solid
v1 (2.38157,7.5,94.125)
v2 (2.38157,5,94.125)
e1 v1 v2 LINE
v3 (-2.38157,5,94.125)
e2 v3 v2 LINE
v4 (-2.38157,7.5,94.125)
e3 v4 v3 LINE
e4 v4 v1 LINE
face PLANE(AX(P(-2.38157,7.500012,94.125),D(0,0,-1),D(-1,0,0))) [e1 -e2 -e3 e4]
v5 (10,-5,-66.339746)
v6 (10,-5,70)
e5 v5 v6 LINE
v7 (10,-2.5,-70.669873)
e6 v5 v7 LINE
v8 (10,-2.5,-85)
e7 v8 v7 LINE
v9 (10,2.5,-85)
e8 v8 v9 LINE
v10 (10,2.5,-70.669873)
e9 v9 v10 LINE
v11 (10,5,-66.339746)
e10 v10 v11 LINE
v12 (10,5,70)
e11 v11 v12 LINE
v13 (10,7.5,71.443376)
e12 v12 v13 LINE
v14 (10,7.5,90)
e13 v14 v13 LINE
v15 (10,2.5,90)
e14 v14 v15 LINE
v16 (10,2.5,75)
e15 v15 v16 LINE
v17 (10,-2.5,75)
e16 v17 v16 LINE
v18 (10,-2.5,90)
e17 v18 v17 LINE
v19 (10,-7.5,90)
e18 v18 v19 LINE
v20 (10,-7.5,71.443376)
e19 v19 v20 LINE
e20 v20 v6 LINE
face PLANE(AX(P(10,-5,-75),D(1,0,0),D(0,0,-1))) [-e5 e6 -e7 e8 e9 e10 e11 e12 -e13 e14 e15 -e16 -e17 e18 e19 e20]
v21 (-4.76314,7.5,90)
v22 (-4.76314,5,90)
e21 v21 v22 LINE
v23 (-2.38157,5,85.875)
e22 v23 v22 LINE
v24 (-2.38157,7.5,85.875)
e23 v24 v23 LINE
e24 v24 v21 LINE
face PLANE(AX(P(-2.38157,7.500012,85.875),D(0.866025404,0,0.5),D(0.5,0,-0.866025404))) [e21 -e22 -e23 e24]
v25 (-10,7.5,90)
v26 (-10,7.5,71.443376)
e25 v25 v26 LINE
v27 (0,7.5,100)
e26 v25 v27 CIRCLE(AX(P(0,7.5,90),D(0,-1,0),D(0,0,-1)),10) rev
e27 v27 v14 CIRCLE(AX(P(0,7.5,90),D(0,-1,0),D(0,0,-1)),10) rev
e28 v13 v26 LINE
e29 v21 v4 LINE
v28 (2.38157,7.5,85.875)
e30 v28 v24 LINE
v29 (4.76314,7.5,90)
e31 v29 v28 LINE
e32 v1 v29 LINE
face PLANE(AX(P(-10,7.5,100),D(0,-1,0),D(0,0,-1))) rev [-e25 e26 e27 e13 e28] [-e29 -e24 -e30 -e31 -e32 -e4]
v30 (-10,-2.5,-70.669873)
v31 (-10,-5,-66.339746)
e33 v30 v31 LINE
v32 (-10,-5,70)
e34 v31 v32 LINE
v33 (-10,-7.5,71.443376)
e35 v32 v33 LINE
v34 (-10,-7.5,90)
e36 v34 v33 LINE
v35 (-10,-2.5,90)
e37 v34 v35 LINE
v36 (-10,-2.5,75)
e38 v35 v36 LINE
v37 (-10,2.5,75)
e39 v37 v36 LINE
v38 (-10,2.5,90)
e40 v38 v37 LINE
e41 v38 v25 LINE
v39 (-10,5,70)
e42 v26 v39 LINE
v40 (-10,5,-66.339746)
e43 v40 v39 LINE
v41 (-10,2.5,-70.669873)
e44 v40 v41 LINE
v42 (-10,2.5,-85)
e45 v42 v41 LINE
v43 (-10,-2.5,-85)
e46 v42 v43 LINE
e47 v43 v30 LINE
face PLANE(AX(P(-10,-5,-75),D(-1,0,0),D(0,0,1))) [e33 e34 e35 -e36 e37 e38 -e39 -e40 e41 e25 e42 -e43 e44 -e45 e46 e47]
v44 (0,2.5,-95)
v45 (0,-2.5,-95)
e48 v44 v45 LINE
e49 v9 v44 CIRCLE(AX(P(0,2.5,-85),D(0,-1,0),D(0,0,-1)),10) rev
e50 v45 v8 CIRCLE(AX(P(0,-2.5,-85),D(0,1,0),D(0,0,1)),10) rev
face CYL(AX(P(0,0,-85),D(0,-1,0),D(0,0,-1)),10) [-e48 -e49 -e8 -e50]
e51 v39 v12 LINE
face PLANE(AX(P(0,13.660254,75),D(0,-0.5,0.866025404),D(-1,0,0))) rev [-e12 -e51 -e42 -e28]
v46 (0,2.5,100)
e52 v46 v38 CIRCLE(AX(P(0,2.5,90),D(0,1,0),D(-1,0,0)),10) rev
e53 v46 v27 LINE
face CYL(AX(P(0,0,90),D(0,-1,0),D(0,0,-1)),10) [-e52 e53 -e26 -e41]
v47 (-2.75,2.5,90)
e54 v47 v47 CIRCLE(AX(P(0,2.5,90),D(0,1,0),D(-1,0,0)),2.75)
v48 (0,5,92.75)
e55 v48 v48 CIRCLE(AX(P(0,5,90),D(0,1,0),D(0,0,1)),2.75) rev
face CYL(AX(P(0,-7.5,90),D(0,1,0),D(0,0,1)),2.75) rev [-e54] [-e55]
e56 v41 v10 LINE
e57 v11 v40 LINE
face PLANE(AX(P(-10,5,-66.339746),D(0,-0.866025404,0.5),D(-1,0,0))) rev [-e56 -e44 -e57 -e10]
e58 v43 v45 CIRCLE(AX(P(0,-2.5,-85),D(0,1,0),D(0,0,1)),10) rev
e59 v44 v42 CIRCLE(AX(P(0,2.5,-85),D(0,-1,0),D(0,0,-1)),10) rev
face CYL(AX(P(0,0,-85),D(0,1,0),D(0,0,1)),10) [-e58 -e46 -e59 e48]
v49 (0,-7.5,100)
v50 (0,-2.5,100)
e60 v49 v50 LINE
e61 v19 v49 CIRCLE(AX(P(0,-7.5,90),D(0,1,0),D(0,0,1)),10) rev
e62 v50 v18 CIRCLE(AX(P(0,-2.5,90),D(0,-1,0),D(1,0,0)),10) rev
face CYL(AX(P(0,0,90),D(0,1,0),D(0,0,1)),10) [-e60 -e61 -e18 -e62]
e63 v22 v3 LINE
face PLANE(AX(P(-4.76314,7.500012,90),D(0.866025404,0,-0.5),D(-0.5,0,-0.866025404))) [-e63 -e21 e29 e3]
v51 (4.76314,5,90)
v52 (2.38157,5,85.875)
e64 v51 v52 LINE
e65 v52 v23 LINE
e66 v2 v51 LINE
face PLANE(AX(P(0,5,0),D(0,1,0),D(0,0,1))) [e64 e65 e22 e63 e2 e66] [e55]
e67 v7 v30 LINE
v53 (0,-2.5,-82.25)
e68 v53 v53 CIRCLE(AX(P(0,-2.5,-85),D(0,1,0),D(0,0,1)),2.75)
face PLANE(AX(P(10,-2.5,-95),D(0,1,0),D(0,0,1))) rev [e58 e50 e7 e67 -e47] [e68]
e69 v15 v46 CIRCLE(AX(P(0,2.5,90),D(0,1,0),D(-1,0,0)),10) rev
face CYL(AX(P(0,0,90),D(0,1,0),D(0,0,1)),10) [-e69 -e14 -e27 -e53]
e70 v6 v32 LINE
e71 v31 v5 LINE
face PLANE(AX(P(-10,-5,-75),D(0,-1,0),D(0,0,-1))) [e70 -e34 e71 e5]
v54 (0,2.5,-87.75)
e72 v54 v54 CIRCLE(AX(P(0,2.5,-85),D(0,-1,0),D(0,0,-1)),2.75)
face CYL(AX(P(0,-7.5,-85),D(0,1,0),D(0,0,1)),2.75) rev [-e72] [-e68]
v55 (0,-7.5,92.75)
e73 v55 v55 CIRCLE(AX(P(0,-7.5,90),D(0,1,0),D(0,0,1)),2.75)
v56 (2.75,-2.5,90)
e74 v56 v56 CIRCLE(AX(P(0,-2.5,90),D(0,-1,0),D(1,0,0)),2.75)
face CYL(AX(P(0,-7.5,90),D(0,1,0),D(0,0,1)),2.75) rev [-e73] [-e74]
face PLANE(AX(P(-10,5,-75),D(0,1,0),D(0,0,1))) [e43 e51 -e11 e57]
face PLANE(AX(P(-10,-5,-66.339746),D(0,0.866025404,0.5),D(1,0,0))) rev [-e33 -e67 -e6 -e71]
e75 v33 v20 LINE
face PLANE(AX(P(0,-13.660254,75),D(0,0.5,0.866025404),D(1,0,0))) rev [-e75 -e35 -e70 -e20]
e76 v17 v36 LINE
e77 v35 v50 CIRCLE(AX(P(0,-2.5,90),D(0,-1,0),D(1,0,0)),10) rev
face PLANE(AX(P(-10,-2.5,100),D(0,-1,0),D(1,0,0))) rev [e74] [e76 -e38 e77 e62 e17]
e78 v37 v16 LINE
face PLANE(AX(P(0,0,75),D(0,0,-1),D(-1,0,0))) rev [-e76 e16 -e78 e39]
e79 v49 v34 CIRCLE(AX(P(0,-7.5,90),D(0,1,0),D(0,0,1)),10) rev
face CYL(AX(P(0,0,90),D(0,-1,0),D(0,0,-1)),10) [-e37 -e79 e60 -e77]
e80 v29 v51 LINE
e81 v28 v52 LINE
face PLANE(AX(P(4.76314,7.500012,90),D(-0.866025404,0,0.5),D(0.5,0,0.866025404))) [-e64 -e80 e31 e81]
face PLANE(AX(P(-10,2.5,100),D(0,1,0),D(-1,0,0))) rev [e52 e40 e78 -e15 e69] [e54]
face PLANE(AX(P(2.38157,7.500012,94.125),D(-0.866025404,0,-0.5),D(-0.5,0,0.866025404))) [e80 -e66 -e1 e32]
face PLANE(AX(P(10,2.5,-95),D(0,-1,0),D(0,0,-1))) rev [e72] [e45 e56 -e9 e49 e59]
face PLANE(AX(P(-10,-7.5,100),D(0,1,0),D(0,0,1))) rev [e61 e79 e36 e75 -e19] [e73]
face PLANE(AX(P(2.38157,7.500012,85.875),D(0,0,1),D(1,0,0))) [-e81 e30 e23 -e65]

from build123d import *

# Parameters (mm, degrees)
BOSS_EXTRUDE1_DEPTH      = 75
BOSS_EXTRUDE1_DEPTH_BACK = 75
SKETCH1_W                = 20
SKETCH1_H                = 10
SKETCH3_W                = 20
SKETCH3_H                = 5
BOSS_EXTRUDE2_DEPTH      = 20
FILLET1_R                = 10
SKETCH5_W                = 20
SKETCH5_H                = 5
BOSS_EXTRUDE3_DEPTH      = 25
CHAMFER1_SIZE            = 5
CHAMFER1_SIZE_2          = 8.660254038
FILLET2_R                = 10
CUT_EXTRUDE1_DEPTH       = 101.995049384
CUT_EXTRUDE1_DEPTH_BACK  = 101.995049384
SKETCH4_R                = 2.75
CUT_EXTRUDE2_DEPTH       = 102.612007165
CUT_EXTRUDE2_DEPTH_BACK  = 2.5


# Some blends are built 0.0001 mm under size
with BuildPart() as part:
    # Sketch1 → Boss-Extrude1 (new, two sides: drawn at the far end of the back side and taken through both)
    with BuildSketch(Plane.XY.offset(-BOSS_EXTRUDE1_DEPTH_BACK)):
        Rectangle(SKETCH1_W, SKETCH1_H)
    extrude(amount=BOSS_EXTRUDE1_DEPTH + BOSS_EXTRUDE1_DEPTH_BACK)

    # Sketch3 → Boss-Extrude2 (add)
    with BuildSketch(Plane(origin=(0, 0, -75), x_dir=(-1, 0, 0), z_dir=(0, 0, -1))):
        Rectangle(SKETCH3_W, SKETCH3_H)
    extrude(amount=BOSS_EXTRUDE2_DEPTH)

    # Fillet1
    fillet1_edges = [part.edges().sort_by_distance(p)[0] for p in [
        (-10, 0, -95),
        (10, 0, -95),
    ]]
    fillet(fillet1_edges, radius=FILLET1_R - 0.0001)  # a hair under: the kernel refuses the full size

    # Sketch5 → Boss-Extrude3 (add)
    with BuildSketch(Plane.XY.offset(75)):
        with Locations((0, 5)):
            Rectangle(SKETCH5_W, SKETCH5_H)
        with Locations((0, -5)):
            Rectangle(SKETCH5_W, SKETCH5_H)
    extrude(amount=BOSS_EXTRUDE3_DEPTH)

    # Chamfer1
    # the kernel refuses this chamfer: 8.660254038, 5 mm, written as the material it adds along each edge
    with BuildSketch(Plane(origin=(10, 5, 75), x_dir=(0, -0.05789386240267149, -0.9983227437537926), z_dir=(-1, 0, 0))) as chamfer1_piece_1_section:
        Polygon((CHAMFER1_SIZE * 0.998322743754, -CHAMFER1_SIZE * 0.0578938624027), (-CHAMFER1_SIZE_2 * 0.0578938624016, -CHAMFER1_SIZE_2 * 0.998322743736), (0, 0), align=None)
    chamfer1_piece_1 = extrude(amount=20, mode=Mode.PRIVATE)
    chamfer1_piece_1 = split(chamfer1_piece_1, bisect_by=Plane(origin=(0, 7.5, 72.827003025), z_dir=(0, -1, 0)), keep=Keep.TOP, mode=Mode.PRIVATE)
    add(chamfer1_piece_1)
    with BuildSketch(Plane(origin=(-10, -5, 75), x_dir=(0, 0.05789386240267149, -0.9983227437537926), z_dir=(1, 0, 0))) as chamfer1_piece_2_section:
        Polygon((CHAMFER1_SIZE * 0.998322743754, -CHAMFER1_SIZE * 0.0578938624027), (-CHAMFER1_SIZE_2 * 0.0578938624016, -CHAMFER1_SIZE_2 * 0.998322743736), (0, 0), align=None)
    chamfer1_piece_2 = extrude(amount=20, mode=Mode.PRIVATE)
    chamfer1_piece_2 = split(chamfer1_piece_2, bisect_by=Plane(origin=(0, -7.5, 72.827003025), z_dir=(0, 1, 0)), keep=Keep.TOP, mode=Mode.PRIVATE)
    add(chamfer1_piece_2)
    # the kernel refuses this chamfer: 8.660254038, 5 mm, written as the material it takes off along each edge
    with BuildSketch(Plane(origin=(32.404819853, 5, -75), x_dir=(0, 0.019326765612700594, 0.999813220622208), z_dir=(-1, 0, 0))) as chamfer1_2_piece_1_section:
        Polygon((CHAMFER1_SIZE_2 * 0.999813220604, -CHAMFER1_SIZE_2 * 0.0193267656124), (-CHAMFER1_SIZE * 0.0193267656127, -CHAMFER1_SIZE * 0.999813220622), (0, 0), align=None)
    chamfer1_2_piece_1 = extrude(amount=64.809639706, mode=Mode.PRIVATE)
    chamfer1_2_piece_1 = split(chamfer1_2_piece_1, bisect_by=Plane(origin=(0, 2.5, -71.539331058), z_dir=(0, 1, 0)), keep=Keep.TOP, mode=Mode.PRIVATE)
    add(chamfer1_2_piece_1, mode=Mode.SUBTRACT)
    with BuildSketch(Plane(origin=(-32.404819853, -5, -75), x_dir=(0, 0.9983227437537926, -0.05789386240267045), z_dir=(1, 0, 0))) as chamfer1_2_piece_2_section:
        Polygon((CHAMFER1_SIZE * 0.998322743754, CHAMFER1_SIZE * 0.0578938624027), (-CHAMFER1_SIZE_2 * 0.0578938624016, CHAMFER1_SIZE_2 * 0.998322743736), (0, 0), align=None)
    chamfer1_2_piece_2 = extrude(amount=64.809639706, mode=Mode.PRIVATE)
    chamfer1_2_piece_2 = split(chamfer1_2_piece_2, bisect_by=Plane(origin=(0, -2.5, -71.539331058), z_dir=(0, -1, 0)), keep=Keep.TOP, mode=Mode.PRIVATE)
    add(chamfer1_2_piece_2, mode=Mode.SUBTRACT)

    # Fillet2
    fillet2_edges = [part.edges().sort_by_distance(p)[0] for p in [
        (-10, -5, 100),
        (-10, 5, 100),
        (10, -5, 100),
        (10, 5, 100),
    ]]
    fillet(fillet2_edges, radius=FILLET2_R - 0.0001)  # a hair under: the kernel refuses the full size

    # Sketch4 → Cut-Extrude1 (cut, two sides: drawn at the far end of the back side and taken through both)
    with BuildSketch(Plane(origin=(0, 2.5, 0), x_dir=(1, 0, 0), z_dir=(0, 1, 0)).offset(-CUT_EXTRUDE1_DEPTH_BACK)):
        with Locations(Location((0, 85, 0), (0, 0, 270))):
            Circle(SKETCH4_R)
        with Locations(Location((0, -90, 0), (0, 0, 270))):
            Circle(SKETCH4_R)
    extrude(amount=CUT_EXTRUDE1_DEPTH + CUT_EXTRUDE1_DEPTH_BACK, mode=Mode.SUBTRACT)

    # Sketch6 → Cut-Extrude2 (cut, two sides: drawn at the far end of the back side and taken through both)
    with BuildSketch(Plane(origin=(0, 7.5, 0), x_dir=(1, 0, 0), z_dir=(0, 1, 0)).offset(-CUT_EXTRUDE2_DEPTH_BACK)):
        Polygon((-2.38156986, -85.875), (-4.763139721, -90), (-2.38156986, -94.125), (2.38156986, -94.125), (4.763139721, -90), (2.38156986, -85.875), align=None)
    extrude(amount=CUT_EXTRUDE2_DEPTH + CUT_EXTRUDE2_DEPTH_BACK, mode=Mode.SUBTRACT)


solid = part.part
